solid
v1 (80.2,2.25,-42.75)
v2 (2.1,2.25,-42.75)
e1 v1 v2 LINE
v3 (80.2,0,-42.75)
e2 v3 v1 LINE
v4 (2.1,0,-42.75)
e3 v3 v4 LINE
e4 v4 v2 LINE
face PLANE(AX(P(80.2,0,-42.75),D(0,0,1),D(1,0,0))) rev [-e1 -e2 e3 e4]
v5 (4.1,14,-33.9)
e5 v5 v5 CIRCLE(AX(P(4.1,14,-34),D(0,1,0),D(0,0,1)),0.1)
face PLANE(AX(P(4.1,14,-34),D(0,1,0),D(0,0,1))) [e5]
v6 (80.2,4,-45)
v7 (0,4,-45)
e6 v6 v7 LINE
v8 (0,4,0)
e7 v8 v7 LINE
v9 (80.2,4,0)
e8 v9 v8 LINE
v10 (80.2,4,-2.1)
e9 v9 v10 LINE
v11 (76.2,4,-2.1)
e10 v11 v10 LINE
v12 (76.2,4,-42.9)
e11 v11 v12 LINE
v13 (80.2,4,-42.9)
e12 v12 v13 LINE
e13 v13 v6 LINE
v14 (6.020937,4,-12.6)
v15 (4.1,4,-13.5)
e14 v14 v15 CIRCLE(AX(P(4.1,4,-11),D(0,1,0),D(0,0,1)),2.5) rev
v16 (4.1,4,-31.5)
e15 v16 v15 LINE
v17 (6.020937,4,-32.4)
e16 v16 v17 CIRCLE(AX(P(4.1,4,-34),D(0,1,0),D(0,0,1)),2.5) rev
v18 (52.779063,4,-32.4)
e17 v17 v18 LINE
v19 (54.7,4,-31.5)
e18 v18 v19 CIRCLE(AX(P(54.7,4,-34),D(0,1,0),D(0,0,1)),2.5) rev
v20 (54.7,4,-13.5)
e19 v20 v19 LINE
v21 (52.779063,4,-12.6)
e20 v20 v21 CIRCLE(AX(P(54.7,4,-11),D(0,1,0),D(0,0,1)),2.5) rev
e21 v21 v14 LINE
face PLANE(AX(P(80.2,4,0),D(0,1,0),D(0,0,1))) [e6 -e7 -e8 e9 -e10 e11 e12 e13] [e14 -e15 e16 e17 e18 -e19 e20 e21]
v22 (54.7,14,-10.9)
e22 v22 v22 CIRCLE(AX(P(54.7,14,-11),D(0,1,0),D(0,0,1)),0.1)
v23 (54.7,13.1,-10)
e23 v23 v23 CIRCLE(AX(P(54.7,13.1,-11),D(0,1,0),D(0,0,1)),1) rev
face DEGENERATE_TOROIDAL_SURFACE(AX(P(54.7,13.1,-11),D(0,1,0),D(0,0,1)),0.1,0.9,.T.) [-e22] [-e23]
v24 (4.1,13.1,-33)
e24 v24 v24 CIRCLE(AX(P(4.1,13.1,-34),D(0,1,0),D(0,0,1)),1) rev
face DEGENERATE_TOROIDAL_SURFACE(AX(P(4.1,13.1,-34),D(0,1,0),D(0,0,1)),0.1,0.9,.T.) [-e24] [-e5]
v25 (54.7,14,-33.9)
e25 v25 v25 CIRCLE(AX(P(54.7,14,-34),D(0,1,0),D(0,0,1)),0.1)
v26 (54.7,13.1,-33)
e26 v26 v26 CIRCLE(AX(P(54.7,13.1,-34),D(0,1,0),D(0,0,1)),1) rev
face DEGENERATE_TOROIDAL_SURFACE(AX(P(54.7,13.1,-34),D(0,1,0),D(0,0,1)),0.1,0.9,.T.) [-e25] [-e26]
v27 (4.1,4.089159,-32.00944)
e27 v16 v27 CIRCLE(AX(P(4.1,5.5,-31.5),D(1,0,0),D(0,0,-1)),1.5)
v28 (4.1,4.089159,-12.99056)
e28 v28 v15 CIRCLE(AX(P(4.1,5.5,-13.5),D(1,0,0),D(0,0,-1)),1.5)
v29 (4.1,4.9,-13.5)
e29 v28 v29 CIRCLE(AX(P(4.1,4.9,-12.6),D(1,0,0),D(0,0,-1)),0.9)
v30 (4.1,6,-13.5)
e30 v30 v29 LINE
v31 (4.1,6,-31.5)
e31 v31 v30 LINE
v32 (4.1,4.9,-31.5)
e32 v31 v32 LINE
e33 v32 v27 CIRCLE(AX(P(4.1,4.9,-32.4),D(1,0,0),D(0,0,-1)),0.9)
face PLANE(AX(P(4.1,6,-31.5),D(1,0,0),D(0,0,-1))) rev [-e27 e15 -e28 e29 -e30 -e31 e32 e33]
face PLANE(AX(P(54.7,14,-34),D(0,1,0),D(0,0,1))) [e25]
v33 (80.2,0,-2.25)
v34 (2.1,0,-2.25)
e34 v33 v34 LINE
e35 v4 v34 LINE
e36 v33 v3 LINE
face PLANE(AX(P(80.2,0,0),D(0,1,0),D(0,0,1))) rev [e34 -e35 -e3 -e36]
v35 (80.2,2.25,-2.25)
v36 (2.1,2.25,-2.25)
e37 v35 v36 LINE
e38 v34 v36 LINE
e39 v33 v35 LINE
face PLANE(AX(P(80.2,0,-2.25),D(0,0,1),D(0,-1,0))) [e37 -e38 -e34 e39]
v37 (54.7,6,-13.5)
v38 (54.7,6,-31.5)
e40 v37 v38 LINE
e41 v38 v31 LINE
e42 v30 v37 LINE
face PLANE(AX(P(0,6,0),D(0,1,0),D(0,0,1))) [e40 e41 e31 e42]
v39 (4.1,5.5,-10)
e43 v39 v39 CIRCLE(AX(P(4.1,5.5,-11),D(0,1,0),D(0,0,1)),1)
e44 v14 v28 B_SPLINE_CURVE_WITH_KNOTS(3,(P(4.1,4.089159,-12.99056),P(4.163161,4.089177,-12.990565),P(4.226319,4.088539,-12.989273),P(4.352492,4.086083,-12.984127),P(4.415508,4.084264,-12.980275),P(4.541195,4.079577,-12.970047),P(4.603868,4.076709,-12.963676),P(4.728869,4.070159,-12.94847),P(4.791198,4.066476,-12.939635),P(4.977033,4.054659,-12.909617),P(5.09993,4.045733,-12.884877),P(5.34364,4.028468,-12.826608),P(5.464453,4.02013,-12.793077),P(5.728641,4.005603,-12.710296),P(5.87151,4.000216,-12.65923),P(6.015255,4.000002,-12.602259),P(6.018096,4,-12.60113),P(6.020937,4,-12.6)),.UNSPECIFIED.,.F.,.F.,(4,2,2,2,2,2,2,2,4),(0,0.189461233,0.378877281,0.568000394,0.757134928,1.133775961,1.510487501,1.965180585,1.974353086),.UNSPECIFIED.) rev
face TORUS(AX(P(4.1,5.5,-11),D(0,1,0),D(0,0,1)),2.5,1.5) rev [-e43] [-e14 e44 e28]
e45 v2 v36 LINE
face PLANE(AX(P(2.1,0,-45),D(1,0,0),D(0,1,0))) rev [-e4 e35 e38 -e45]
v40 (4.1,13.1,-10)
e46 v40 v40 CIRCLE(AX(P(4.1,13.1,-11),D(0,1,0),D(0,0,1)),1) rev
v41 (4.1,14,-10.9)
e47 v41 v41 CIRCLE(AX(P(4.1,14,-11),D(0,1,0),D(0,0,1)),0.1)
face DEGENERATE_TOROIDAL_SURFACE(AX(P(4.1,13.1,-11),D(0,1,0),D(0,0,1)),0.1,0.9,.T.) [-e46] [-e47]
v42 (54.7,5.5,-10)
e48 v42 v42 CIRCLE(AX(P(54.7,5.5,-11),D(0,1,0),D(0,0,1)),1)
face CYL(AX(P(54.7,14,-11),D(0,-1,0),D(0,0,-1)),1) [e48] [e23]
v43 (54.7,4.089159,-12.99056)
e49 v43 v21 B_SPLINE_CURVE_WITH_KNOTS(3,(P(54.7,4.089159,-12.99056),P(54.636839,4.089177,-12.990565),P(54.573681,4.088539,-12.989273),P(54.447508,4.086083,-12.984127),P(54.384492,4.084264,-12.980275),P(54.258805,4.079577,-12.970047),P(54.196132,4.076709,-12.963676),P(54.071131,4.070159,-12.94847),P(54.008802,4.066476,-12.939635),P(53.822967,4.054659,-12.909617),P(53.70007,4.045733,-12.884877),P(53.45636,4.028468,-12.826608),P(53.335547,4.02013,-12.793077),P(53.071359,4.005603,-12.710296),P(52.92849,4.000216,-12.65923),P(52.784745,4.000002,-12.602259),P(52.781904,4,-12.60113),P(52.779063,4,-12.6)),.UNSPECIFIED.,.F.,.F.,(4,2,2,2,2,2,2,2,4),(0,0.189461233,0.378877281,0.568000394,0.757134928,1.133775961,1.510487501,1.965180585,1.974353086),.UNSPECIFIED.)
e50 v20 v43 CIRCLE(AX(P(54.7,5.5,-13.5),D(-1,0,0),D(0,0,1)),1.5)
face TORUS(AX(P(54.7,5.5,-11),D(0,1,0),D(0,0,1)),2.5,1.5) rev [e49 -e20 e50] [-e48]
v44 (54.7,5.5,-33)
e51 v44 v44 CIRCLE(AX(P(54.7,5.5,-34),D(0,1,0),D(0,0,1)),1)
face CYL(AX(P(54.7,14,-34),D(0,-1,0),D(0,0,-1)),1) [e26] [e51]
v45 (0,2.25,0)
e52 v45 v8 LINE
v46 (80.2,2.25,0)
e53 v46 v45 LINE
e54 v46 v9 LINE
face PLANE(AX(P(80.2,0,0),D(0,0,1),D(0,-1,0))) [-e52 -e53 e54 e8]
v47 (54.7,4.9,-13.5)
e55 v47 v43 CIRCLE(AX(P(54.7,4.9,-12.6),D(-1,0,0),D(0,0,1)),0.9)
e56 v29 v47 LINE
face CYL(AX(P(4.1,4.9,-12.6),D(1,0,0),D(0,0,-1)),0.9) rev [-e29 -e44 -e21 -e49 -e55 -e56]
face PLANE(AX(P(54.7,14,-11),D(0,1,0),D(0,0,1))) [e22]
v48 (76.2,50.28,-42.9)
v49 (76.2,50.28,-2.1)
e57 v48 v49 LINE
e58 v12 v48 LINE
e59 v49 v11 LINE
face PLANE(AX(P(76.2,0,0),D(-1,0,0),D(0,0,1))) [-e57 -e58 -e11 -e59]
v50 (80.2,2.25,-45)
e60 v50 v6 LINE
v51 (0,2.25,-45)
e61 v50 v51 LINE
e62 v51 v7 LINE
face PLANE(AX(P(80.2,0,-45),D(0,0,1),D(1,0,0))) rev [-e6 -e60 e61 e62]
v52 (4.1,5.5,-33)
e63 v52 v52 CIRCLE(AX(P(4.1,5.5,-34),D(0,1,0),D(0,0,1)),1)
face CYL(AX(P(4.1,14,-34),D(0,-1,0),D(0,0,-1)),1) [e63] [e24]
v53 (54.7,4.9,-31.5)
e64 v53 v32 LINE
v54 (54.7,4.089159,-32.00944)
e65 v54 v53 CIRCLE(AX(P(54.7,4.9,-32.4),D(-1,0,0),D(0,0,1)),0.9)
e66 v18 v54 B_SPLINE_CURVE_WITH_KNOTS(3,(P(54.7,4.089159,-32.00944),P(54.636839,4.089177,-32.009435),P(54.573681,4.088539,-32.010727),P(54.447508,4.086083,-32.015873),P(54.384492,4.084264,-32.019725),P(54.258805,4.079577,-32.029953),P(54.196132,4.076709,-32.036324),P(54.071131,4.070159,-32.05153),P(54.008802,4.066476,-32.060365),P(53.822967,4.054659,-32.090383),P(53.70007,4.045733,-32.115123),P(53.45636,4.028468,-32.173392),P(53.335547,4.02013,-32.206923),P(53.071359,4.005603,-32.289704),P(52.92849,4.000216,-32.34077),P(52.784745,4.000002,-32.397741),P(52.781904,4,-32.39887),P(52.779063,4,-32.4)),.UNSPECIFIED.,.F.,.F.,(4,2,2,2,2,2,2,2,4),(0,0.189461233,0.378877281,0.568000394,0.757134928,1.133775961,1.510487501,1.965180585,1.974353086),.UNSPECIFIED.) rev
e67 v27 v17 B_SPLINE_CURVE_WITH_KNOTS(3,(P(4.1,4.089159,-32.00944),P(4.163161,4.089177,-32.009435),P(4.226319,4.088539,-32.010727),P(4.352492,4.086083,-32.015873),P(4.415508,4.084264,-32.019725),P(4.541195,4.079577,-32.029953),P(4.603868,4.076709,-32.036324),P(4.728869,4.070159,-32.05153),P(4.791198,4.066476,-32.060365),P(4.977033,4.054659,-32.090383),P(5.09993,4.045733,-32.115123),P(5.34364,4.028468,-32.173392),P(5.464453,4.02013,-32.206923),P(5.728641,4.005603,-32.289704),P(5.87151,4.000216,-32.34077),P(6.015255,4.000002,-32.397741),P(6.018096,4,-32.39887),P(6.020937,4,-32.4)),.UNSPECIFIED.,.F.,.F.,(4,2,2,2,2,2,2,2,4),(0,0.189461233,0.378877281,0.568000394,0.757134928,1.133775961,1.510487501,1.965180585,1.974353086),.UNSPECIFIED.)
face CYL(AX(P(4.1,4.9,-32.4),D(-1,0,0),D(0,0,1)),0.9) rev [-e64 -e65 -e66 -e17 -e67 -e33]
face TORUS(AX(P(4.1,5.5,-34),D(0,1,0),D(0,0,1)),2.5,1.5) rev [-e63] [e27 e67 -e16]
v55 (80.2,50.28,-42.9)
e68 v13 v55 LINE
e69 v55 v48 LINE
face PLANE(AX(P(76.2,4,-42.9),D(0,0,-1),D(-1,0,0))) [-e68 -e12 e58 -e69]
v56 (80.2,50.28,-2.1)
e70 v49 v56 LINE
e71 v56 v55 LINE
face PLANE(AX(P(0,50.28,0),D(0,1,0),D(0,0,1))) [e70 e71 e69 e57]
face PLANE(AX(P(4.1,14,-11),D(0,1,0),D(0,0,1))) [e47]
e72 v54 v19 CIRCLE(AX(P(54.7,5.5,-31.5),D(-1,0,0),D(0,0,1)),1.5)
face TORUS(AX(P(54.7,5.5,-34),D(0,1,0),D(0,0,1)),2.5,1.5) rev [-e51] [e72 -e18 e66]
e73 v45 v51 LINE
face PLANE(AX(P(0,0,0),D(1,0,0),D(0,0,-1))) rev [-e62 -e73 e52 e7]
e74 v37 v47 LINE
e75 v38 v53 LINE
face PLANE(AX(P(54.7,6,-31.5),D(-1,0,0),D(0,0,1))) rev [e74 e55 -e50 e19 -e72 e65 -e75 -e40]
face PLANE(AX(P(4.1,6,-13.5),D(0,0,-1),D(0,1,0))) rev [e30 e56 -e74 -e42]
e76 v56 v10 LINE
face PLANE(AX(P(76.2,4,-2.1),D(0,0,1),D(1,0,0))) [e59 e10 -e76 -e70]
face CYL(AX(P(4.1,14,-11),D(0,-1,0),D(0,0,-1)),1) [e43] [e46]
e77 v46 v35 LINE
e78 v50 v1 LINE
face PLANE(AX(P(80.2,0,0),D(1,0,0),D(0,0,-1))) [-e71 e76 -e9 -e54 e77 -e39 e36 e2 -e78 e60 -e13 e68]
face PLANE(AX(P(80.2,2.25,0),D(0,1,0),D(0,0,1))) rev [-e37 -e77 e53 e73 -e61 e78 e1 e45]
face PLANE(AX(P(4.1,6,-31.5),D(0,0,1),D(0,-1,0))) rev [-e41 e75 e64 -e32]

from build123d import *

# Parameters (mm, degrees)
BOSS_EXTRU_4_DEPTH           = 80.2
ENL_V_MAT_EXTRU_5_DEPTH      = 91.970338573
ENL_V_MAT_EXTRU_5_DEPTH_BACK = 91.970338573
ESQUISSE10_W                 = 2.1
ESQUISSE10_H                 = 2.25
ESQUISSE11_W                 = 40.8
ESQUISSE11_H                 = 45.5
BOSS_EXTRU_5_DEPTH           = 4
ESQUISSE12_W                 = 4
ESQUISSE12_H                 = 40.8
BOSS_EXTRU_6_DEPTH           = 0.78
ESQUISSE13_R                 = 1
BOSS_EXTRU_7_DEPTH           = 10
CONG_1_R                     = 1.5
CONG_5_R                     = 0.9
ESQUISSE14_W                 = 50.6
ESQUISSE14_H                 = 18
BOSS_EXTRU_8_DEPTH           = 2
CONG_7_START                 = 4.1
CONG_7_DEPTH                 = 50.6


with BuildPart() as part:
    # Esquisse9 → Boss.-Extru.4 (new body)
    with BuildSketch(Plane(origin=(0, 0, 0), x_dir=(0, 0, -1), z_dir=(1, 0, 0))):
        Polygon((2.25, 2.25), (2.25, 0), (42.75, 0), (42.75, 2.25), (45, 2.25), (45, 4), (0, 4), (0, 2.25), align=None)
    extrude(amount=BOSS_EXTRU_4_DEPTH)

    # Esquisse10 → Enlèv. mat.-Extru.5 (cut, two sides: drawn at the far end of the back side and taken through both)
    with BuildSketch(Plane.XY.offset(-2.25).offset(-ENL_V_MAT_EXTRU_5_DEPTH_BACK)):
        with Locations((1.05, 1.125)):
            Rectangle(ESQUISSE10_W, ESQUISSE10_H)
    extrude(amount=ENL_V_MAT_EXTRU_5_DEPTH + ENL_V_MAT_EXTRU_5_DEPTH_BACK, mode=Mode.SUBTRACT)

    # Esquisse11 → Boss.-Extru.5 (add)
    with BuildSketch(Plane(origin=(80.2, 0, 0), x_dir=(0, 0, -1), z_dir=(1, 0, 0))):
        with Locations((22.5, 26.75)):
            Rectangle(ESQUISSE11_W, ESQUISSE11_H)
    extrude(amount=-BOSS_EXTRU_5_DEPTH)

    # Esquisse12 → Boss.-Extru.6 (add)
    with BuildSketch(Plane(origin=(0, 49.5, 0), x_dir=(1, 0, 0), z_dir=(0, 1, 0))):
        with Locations((78.2, 22.5)):
            Rectangle(ESQUISSE12_W, ESQUISSE12_H)
    extrude(amount=BOSS_EXTRU_6_DEPTH)

    # Esquisse13 → Boss.-Extru.7 (add)
    with BuildSketch(Plane(origin=(0, 4, 0), x_dir=(1, 0, 0), z_dir=(0, 1, 0))):
        with Locations(Location((4.1, 34, 0), (0, 0, 270))):
            Circle(ESQUISSE13_R)
        with Locations(Location((4.1, 11, 0), (0, 0, 270))):
            Circle(ESQUISSE13_R)
        with Locations(Location((54.7, 11, 0), (0, 0, 270))):
            Circle(ESQUISSE13_R)
        with Locations(Location((54.7, 34, 0), (0, 0, 270))):
            Circle(ESQUISSE13_R)
    extrude(amount=BOSS_EXTRU_7_DEPTH)

    # Congé1
    cong_1_edges = [part.edges().sort_by_distance(p)[0] for p in [
        (54.7, 4, -35),
        (54.7, 4, -12),
        (4.1, 4, -12),
        (4.1, 4, -35),
    ]]
    fillet(cong_1_edges, radius=CONG_1_R)

    # Congé5
    cong_5_edges = [part.edges().sort_by_distance(p)[0] for p in [
        (54.7, 14, -35),
        (54.7, 14, -12),
        (4.1, 14, -12),
        (4.1, 14, -35),
    ]]
    fillet(cong_5_edges, radius=CONG_5_R)

    # Esquisse14 → Boss.-Extru.8 (add)
    with BuildSketch(Plane(origin=(0, 4, 0), x_dir=(1, 0, 0), z_dir=(0, 1, 0))):
        with Locations((29.4, 22.5)):
            Rectangle(ESQUISSE14_W, ESQUISSE14_H)
    extrude(amount=BOSS_EXTRU_8_DEPTH)

    # Congé7: read off the stored shape, not the designer's step
    # Congé7 outline → Congé7 (add)
    with BuildSketch(Plane.YZ.offset(CONG_7_START)):
        with BuildLine():
            Line((4, -31.5), (4, -32.4))
            ThreePointArc((4, -32.4), (4.263603897, -31.763603897), (4.9, -31.5))
            Line((4.9, -31.5), (4, -31.5))
        make_face()
        with BuildLine():
            Line((4, -12.6), (4, -13.5))
            Line((4, -13.5), (4.9, -13.5))
            ThreePointArc((4.9, -13.5), (4.263603897, -13.236396103), (4, -12.6))
        make_face()
    extrude(amount=CONG_7_DEPTH)


solid = part.part
